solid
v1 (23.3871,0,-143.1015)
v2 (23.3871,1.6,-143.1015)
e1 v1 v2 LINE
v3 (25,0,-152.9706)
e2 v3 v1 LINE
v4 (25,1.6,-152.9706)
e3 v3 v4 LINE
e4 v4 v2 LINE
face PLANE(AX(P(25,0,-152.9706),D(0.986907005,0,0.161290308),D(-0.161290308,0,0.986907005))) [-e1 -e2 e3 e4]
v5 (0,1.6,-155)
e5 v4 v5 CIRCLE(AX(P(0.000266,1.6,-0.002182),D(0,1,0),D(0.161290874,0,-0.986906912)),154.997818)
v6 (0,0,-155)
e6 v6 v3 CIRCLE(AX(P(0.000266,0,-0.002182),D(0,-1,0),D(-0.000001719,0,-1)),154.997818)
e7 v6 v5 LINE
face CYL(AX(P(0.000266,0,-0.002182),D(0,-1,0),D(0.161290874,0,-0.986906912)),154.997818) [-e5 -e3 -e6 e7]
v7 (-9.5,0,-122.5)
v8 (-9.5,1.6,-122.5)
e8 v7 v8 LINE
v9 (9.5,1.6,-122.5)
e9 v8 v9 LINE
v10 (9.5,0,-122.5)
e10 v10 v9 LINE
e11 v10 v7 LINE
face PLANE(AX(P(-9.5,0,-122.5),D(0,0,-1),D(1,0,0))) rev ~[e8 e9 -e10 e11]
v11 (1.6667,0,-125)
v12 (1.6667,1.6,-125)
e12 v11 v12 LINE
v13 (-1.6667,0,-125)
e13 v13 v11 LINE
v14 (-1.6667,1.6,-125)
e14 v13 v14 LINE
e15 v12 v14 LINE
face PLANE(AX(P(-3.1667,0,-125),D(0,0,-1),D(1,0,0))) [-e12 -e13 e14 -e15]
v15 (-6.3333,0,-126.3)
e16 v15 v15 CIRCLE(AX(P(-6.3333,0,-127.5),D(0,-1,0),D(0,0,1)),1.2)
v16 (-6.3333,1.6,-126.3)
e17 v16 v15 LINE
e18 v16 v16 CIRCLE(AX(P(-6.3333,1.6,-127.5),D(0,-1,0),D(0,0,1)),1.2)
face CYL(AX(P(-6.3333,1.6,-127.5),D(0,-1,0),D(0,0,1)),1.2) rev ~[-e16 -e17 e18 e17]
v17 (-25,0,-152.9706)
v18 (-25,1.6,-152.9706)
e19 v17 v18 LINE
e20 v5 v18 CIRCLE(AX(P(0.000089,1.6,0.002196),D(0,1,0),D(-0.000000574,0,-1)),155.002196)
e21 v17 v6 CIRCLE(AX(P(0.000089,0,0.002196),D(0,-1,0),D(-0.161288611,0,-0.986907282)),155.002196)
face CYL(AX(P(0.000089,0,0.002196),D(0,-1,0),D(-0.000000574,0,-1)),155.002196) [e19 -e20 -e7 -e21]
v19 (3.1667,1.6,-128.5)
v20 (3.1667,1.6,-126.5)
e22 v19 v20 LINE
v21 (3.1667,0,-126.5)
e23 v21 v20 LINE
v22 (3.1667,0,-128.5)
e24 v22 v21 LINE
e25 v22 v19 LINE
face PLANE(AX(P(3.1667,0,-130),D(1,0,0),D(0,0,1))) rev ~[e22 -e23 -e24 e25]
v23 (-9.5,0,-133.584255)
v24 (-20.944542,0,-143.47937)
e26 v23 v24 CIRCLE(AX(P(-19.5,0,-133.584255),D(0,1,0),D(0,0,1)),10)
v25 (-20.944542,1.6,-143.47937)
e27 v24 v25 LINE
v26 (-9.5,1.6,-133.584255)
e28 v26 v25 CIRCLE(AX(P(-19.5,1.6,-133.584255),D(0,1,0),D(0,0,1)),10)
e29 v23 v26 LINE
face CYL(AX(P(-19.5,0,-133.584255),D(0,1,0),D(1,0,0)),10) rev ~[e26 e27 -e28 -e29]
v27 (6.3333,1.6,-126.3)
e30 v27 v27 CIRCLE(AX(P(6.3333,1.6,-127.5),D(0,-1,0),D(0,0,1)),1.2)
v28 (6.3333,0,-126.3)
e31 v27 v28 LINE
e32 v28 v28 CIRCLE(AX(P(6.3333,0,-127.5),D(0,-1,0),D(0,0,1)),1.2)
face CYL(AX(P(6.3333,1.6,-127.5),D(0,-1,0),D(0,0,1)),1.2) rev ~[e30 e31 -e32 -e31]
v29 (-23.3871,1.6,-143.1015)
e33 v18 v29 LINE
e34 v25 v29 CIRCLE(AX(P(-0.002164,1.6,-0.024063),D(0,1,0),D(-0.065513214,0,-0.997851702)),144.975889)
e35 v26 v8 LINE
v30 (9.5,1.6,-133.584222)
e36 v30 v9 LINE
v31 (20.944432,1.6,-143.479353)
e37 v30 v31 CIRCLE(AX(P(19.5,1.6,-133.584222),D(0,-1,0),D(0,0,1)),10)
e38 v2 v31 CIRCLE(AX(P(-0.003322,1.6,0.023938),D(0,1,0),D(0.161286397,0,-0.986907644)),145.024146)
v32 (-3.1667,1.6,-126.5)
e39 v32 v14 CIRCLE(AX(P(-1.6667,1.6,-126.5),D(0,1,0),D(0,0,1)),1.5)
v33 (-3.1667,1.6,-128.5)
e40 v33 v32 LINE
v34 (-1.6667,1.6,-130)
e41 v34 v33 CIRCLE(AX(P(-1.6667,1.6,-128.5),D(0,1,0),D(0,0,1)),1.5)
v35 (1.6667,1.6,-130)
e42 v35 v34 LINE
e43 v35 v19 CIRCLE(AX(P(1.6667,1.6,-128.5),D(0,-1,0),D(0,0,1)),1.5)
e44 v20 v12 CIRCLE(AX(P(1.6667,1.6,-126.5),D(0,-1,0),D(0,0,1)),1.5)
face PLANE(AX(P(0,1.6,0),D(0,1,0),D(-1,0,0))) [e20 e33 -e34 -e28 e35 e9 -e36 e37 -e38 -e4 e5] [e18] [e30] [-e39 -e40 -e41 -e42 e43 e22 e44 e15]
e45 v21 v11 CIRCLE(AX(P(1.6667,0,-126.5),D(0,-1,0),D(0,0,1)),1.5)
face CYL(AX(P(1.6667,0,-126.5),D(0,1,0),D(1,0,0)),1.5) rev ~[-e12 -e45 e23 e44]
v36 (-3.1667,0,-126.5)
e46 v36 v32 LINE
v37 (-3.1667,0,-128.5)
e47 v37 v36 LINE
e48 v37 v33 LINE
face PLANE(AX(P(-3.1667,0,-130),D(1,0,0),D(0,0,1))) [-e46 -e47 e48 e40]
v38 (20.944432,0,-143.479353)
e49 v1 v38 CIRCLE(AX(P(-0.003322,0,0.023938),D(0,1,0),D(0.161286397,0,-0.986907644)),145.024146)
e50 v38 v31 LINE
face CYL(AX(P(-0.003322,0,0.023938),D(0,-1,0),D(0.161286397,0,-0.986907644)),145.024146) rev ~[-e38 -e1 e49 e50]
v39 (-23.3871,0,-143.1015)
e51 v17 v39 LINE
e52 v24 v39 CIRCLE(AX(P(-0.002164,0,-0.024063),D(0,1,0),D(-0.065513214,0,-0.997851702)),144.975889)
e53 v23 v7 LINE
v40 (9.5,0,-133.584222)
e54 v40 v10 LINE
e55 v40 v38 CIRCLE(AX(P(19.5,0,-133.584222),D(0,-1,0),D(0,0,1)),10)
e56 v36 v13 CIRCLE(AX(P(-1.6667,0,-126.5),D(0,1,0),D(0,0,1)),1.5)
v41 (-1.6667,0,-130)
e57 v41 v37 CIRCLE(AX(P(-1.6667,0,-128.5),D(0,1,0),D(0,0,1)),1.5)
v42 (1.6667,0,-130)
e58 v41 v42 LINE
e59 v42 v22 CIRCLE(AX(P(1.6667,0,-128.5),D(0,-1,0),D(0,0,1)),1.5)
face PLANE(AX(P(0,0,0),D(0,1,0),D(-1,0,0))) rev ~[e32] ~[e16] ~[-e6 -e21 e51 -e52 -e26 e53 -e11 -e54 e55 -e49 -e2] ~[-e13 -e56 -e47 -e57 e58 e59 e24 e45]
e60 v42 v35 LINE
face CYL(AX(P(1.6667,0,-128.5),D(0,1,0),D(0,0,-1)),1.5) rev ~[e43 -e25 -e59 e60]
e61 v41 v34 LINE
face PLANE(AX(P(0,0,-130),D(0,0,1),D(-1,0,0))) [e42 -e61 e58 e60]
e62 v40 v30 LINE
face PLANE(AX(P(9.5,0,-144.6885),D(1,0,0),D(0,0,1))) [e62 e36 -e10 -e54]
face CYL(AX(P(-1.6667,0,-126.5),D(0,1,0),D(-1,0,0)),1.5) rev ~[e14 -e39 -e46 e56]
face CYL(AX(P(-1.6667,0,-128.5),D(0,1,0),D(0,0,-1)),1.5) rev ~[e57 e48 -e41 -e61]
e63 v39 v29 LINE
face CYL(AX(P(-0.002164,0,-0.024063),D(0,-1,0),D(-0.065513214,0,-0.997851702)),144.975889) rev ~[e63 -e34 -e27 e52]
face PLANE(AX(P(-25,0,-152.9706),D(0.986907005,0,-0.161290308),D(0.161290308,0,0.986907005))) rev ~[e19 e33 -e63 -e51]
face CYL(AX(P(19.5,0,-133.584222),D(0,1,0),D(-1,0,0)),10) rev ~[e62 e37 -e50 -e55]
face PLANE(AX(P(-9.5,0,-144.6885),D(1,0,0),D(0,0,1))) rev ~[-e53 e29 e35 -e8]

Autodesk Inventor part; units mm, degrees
ref_plane "YZ Plane" through (0, 0, 0) normal (1, 0, 0) x (0, 1, 0)
ref_plane "XZ Plane" through (0, 0, 0) normal (0, 1, 0) x (-1, 0, 0)
ref_plane "XY Plane" through (0, 0, 0) normal (0, 0, 1) x (1, 0, 0)
sketch "スケッチ1" plane through (0, 0, 0) normal (0, 1, 0) x (-1, 0, 0)
  arc A0 (0, -155) -> (25, -152.9706) centre (0, 0) ccw
  line L0 (25, -152.9706) -> (0, 0)
  line L1 (0, 0) -> (0, -144.6885)
  arc A1 (9.5, -144.6885) -> (23.3871, -143.1015) centre (0, 0) ccw
  line L2 (9.5, -144.6885) -> (9.5, -122.5)
  line L3 (9.5, -122.5) -> (0, -122.5)
  arc A2 (-25, -152.9706) -> (0, -155) centre (0, 0) ccw
  line L4 (-25, -152.9706) -> (0, 0)
  arc A3 (-23.3871, -143.1015) -> (-9.5, -144.6885) centre (0, 0) ccw
  line L5 (-9.5, -144.6885) -> (-9.5, -122.5)
  line L6 (-9.5, -122.5) -> (0, -122.5)
  line L7 (9.5, -144.6885) -> (0, -144.6885) construction
  line L8 (-9.5, -144.6885) -> (0, -144.6885) construction
  line L9 (-9.5, -180.2611) -> (-9.5, 6.4286)
  line L10 (9.5, -180.2611) -> (9.5, 6.4286)
  line L11 (0, -130) -> (-3.1667, -130)
  line L12 (-3.1667, -130) -> (-3.1667, -125)
  line L13 (-3.1667, -125) -> (0, -125)
  line L14 (0, -130) -> (3.1667, -130)
  line L15 (3.1667, -130) -> (3.1667, -125)
  line L16 (3.1667, -125) -> (0, -125)
  line L17 (0, -144.6885) -> (0, -145)
  line L18 (0, -145) -> (0, -155)
  point P0 (0, -125)
  point P1 (0, -150)
  dimension "d4" = 19
  dimension "d12" = 122.5
  dimension "d13" = 10
  dimension "d29" = 19
  dimension "d32" = 5
  dimension "d33" = 6.3333
  dimension "d34" = 2.5
  dimension "d36" = 50
  dimension "d38" = 150
extrude "押し出し1" add sketch "スケッチ1" along normal blind 1.6 contours L18 L17 L1 L14 L15 L16 L3 L2 L10 A0 | A2 L9 L5 L6 L1 L13 L12 L11 L17 L18 | L10 A1 L0 A0 | A2 L4 A3 L9
sketch "スケッチ2" plane through (0, 1.6, 0) normal (0, 1, 0) x (1, 0, 0)
  line L0 (9.5, 122.5) -> (9.5, 144.6885) projected
  arc A0 (23.3871, 143.1015) -> (9.5, 144.6885) centre (0, 0) ccw projected
  line L1 (23.3871, 143.1015) -> (25, 152.9706) projected
  arc A1 (25, 152.9706) -> (-25, 152.9706) centre (0, 0) ccw projected
  line L2 (-25, 152.9706) -> (-23.3871, 143.1015) projected
  arc A2 (-9.5, 144.6885) -> (-23.3871, 143.1015) centre (0, 0) ccw projected
  line L3 (-9.5, 144.6885) -> (-9.5, 122.5) projected
  line L4 (-9.5, 122.5) -> (9.5, 122.5) projected
  line L5 (-9.5, 122.5) -> (5.5, 122.5)
  line L6 (5.5, 122.5) -> (5.5, 132.5)
  line L7 (5.5, 132.5) -> (-9.5, 132.5)
  line L8 (-9.5, 132.5) -> (-9.5, 122.5)
  line L9 (-6.3333, 127.5) -> (-3.1667, 127.5) construction
  line L10 (-6.3333, 127.5) -> (-9.5, 127.5) construction
  line L11 (-3.1667, 125) -> (-3.1667, 130) projected
  point P0 (6.3333, 127.5)
  dimension "d19" = 10
  dimension "d20" = 15
hole "穴1" at (6.3333, 1.6, -127.5) at (-6.3333, 1.6, -127.5) direction (0, -1, 0) diameter 2.4 depth 1.6 clearance for "Countersunk Flat Head Screw ISO 2009/7046" size "M2" standard "ISO"
fillet "フィレット1" radius 10 2 edges at (9.5, 0.8, -144.6885) (-9.5, 0.8, -144.6885)
fillet "フィレット2" radius 1.5 4 edges at (-3.1667, 0.8, -130) (3.1667, 0.8, -125) (3.1667, 0.8, -130) (-3.1667, 0.8, -125)
properties part number "sensor" material "エポキシ樹脂"
